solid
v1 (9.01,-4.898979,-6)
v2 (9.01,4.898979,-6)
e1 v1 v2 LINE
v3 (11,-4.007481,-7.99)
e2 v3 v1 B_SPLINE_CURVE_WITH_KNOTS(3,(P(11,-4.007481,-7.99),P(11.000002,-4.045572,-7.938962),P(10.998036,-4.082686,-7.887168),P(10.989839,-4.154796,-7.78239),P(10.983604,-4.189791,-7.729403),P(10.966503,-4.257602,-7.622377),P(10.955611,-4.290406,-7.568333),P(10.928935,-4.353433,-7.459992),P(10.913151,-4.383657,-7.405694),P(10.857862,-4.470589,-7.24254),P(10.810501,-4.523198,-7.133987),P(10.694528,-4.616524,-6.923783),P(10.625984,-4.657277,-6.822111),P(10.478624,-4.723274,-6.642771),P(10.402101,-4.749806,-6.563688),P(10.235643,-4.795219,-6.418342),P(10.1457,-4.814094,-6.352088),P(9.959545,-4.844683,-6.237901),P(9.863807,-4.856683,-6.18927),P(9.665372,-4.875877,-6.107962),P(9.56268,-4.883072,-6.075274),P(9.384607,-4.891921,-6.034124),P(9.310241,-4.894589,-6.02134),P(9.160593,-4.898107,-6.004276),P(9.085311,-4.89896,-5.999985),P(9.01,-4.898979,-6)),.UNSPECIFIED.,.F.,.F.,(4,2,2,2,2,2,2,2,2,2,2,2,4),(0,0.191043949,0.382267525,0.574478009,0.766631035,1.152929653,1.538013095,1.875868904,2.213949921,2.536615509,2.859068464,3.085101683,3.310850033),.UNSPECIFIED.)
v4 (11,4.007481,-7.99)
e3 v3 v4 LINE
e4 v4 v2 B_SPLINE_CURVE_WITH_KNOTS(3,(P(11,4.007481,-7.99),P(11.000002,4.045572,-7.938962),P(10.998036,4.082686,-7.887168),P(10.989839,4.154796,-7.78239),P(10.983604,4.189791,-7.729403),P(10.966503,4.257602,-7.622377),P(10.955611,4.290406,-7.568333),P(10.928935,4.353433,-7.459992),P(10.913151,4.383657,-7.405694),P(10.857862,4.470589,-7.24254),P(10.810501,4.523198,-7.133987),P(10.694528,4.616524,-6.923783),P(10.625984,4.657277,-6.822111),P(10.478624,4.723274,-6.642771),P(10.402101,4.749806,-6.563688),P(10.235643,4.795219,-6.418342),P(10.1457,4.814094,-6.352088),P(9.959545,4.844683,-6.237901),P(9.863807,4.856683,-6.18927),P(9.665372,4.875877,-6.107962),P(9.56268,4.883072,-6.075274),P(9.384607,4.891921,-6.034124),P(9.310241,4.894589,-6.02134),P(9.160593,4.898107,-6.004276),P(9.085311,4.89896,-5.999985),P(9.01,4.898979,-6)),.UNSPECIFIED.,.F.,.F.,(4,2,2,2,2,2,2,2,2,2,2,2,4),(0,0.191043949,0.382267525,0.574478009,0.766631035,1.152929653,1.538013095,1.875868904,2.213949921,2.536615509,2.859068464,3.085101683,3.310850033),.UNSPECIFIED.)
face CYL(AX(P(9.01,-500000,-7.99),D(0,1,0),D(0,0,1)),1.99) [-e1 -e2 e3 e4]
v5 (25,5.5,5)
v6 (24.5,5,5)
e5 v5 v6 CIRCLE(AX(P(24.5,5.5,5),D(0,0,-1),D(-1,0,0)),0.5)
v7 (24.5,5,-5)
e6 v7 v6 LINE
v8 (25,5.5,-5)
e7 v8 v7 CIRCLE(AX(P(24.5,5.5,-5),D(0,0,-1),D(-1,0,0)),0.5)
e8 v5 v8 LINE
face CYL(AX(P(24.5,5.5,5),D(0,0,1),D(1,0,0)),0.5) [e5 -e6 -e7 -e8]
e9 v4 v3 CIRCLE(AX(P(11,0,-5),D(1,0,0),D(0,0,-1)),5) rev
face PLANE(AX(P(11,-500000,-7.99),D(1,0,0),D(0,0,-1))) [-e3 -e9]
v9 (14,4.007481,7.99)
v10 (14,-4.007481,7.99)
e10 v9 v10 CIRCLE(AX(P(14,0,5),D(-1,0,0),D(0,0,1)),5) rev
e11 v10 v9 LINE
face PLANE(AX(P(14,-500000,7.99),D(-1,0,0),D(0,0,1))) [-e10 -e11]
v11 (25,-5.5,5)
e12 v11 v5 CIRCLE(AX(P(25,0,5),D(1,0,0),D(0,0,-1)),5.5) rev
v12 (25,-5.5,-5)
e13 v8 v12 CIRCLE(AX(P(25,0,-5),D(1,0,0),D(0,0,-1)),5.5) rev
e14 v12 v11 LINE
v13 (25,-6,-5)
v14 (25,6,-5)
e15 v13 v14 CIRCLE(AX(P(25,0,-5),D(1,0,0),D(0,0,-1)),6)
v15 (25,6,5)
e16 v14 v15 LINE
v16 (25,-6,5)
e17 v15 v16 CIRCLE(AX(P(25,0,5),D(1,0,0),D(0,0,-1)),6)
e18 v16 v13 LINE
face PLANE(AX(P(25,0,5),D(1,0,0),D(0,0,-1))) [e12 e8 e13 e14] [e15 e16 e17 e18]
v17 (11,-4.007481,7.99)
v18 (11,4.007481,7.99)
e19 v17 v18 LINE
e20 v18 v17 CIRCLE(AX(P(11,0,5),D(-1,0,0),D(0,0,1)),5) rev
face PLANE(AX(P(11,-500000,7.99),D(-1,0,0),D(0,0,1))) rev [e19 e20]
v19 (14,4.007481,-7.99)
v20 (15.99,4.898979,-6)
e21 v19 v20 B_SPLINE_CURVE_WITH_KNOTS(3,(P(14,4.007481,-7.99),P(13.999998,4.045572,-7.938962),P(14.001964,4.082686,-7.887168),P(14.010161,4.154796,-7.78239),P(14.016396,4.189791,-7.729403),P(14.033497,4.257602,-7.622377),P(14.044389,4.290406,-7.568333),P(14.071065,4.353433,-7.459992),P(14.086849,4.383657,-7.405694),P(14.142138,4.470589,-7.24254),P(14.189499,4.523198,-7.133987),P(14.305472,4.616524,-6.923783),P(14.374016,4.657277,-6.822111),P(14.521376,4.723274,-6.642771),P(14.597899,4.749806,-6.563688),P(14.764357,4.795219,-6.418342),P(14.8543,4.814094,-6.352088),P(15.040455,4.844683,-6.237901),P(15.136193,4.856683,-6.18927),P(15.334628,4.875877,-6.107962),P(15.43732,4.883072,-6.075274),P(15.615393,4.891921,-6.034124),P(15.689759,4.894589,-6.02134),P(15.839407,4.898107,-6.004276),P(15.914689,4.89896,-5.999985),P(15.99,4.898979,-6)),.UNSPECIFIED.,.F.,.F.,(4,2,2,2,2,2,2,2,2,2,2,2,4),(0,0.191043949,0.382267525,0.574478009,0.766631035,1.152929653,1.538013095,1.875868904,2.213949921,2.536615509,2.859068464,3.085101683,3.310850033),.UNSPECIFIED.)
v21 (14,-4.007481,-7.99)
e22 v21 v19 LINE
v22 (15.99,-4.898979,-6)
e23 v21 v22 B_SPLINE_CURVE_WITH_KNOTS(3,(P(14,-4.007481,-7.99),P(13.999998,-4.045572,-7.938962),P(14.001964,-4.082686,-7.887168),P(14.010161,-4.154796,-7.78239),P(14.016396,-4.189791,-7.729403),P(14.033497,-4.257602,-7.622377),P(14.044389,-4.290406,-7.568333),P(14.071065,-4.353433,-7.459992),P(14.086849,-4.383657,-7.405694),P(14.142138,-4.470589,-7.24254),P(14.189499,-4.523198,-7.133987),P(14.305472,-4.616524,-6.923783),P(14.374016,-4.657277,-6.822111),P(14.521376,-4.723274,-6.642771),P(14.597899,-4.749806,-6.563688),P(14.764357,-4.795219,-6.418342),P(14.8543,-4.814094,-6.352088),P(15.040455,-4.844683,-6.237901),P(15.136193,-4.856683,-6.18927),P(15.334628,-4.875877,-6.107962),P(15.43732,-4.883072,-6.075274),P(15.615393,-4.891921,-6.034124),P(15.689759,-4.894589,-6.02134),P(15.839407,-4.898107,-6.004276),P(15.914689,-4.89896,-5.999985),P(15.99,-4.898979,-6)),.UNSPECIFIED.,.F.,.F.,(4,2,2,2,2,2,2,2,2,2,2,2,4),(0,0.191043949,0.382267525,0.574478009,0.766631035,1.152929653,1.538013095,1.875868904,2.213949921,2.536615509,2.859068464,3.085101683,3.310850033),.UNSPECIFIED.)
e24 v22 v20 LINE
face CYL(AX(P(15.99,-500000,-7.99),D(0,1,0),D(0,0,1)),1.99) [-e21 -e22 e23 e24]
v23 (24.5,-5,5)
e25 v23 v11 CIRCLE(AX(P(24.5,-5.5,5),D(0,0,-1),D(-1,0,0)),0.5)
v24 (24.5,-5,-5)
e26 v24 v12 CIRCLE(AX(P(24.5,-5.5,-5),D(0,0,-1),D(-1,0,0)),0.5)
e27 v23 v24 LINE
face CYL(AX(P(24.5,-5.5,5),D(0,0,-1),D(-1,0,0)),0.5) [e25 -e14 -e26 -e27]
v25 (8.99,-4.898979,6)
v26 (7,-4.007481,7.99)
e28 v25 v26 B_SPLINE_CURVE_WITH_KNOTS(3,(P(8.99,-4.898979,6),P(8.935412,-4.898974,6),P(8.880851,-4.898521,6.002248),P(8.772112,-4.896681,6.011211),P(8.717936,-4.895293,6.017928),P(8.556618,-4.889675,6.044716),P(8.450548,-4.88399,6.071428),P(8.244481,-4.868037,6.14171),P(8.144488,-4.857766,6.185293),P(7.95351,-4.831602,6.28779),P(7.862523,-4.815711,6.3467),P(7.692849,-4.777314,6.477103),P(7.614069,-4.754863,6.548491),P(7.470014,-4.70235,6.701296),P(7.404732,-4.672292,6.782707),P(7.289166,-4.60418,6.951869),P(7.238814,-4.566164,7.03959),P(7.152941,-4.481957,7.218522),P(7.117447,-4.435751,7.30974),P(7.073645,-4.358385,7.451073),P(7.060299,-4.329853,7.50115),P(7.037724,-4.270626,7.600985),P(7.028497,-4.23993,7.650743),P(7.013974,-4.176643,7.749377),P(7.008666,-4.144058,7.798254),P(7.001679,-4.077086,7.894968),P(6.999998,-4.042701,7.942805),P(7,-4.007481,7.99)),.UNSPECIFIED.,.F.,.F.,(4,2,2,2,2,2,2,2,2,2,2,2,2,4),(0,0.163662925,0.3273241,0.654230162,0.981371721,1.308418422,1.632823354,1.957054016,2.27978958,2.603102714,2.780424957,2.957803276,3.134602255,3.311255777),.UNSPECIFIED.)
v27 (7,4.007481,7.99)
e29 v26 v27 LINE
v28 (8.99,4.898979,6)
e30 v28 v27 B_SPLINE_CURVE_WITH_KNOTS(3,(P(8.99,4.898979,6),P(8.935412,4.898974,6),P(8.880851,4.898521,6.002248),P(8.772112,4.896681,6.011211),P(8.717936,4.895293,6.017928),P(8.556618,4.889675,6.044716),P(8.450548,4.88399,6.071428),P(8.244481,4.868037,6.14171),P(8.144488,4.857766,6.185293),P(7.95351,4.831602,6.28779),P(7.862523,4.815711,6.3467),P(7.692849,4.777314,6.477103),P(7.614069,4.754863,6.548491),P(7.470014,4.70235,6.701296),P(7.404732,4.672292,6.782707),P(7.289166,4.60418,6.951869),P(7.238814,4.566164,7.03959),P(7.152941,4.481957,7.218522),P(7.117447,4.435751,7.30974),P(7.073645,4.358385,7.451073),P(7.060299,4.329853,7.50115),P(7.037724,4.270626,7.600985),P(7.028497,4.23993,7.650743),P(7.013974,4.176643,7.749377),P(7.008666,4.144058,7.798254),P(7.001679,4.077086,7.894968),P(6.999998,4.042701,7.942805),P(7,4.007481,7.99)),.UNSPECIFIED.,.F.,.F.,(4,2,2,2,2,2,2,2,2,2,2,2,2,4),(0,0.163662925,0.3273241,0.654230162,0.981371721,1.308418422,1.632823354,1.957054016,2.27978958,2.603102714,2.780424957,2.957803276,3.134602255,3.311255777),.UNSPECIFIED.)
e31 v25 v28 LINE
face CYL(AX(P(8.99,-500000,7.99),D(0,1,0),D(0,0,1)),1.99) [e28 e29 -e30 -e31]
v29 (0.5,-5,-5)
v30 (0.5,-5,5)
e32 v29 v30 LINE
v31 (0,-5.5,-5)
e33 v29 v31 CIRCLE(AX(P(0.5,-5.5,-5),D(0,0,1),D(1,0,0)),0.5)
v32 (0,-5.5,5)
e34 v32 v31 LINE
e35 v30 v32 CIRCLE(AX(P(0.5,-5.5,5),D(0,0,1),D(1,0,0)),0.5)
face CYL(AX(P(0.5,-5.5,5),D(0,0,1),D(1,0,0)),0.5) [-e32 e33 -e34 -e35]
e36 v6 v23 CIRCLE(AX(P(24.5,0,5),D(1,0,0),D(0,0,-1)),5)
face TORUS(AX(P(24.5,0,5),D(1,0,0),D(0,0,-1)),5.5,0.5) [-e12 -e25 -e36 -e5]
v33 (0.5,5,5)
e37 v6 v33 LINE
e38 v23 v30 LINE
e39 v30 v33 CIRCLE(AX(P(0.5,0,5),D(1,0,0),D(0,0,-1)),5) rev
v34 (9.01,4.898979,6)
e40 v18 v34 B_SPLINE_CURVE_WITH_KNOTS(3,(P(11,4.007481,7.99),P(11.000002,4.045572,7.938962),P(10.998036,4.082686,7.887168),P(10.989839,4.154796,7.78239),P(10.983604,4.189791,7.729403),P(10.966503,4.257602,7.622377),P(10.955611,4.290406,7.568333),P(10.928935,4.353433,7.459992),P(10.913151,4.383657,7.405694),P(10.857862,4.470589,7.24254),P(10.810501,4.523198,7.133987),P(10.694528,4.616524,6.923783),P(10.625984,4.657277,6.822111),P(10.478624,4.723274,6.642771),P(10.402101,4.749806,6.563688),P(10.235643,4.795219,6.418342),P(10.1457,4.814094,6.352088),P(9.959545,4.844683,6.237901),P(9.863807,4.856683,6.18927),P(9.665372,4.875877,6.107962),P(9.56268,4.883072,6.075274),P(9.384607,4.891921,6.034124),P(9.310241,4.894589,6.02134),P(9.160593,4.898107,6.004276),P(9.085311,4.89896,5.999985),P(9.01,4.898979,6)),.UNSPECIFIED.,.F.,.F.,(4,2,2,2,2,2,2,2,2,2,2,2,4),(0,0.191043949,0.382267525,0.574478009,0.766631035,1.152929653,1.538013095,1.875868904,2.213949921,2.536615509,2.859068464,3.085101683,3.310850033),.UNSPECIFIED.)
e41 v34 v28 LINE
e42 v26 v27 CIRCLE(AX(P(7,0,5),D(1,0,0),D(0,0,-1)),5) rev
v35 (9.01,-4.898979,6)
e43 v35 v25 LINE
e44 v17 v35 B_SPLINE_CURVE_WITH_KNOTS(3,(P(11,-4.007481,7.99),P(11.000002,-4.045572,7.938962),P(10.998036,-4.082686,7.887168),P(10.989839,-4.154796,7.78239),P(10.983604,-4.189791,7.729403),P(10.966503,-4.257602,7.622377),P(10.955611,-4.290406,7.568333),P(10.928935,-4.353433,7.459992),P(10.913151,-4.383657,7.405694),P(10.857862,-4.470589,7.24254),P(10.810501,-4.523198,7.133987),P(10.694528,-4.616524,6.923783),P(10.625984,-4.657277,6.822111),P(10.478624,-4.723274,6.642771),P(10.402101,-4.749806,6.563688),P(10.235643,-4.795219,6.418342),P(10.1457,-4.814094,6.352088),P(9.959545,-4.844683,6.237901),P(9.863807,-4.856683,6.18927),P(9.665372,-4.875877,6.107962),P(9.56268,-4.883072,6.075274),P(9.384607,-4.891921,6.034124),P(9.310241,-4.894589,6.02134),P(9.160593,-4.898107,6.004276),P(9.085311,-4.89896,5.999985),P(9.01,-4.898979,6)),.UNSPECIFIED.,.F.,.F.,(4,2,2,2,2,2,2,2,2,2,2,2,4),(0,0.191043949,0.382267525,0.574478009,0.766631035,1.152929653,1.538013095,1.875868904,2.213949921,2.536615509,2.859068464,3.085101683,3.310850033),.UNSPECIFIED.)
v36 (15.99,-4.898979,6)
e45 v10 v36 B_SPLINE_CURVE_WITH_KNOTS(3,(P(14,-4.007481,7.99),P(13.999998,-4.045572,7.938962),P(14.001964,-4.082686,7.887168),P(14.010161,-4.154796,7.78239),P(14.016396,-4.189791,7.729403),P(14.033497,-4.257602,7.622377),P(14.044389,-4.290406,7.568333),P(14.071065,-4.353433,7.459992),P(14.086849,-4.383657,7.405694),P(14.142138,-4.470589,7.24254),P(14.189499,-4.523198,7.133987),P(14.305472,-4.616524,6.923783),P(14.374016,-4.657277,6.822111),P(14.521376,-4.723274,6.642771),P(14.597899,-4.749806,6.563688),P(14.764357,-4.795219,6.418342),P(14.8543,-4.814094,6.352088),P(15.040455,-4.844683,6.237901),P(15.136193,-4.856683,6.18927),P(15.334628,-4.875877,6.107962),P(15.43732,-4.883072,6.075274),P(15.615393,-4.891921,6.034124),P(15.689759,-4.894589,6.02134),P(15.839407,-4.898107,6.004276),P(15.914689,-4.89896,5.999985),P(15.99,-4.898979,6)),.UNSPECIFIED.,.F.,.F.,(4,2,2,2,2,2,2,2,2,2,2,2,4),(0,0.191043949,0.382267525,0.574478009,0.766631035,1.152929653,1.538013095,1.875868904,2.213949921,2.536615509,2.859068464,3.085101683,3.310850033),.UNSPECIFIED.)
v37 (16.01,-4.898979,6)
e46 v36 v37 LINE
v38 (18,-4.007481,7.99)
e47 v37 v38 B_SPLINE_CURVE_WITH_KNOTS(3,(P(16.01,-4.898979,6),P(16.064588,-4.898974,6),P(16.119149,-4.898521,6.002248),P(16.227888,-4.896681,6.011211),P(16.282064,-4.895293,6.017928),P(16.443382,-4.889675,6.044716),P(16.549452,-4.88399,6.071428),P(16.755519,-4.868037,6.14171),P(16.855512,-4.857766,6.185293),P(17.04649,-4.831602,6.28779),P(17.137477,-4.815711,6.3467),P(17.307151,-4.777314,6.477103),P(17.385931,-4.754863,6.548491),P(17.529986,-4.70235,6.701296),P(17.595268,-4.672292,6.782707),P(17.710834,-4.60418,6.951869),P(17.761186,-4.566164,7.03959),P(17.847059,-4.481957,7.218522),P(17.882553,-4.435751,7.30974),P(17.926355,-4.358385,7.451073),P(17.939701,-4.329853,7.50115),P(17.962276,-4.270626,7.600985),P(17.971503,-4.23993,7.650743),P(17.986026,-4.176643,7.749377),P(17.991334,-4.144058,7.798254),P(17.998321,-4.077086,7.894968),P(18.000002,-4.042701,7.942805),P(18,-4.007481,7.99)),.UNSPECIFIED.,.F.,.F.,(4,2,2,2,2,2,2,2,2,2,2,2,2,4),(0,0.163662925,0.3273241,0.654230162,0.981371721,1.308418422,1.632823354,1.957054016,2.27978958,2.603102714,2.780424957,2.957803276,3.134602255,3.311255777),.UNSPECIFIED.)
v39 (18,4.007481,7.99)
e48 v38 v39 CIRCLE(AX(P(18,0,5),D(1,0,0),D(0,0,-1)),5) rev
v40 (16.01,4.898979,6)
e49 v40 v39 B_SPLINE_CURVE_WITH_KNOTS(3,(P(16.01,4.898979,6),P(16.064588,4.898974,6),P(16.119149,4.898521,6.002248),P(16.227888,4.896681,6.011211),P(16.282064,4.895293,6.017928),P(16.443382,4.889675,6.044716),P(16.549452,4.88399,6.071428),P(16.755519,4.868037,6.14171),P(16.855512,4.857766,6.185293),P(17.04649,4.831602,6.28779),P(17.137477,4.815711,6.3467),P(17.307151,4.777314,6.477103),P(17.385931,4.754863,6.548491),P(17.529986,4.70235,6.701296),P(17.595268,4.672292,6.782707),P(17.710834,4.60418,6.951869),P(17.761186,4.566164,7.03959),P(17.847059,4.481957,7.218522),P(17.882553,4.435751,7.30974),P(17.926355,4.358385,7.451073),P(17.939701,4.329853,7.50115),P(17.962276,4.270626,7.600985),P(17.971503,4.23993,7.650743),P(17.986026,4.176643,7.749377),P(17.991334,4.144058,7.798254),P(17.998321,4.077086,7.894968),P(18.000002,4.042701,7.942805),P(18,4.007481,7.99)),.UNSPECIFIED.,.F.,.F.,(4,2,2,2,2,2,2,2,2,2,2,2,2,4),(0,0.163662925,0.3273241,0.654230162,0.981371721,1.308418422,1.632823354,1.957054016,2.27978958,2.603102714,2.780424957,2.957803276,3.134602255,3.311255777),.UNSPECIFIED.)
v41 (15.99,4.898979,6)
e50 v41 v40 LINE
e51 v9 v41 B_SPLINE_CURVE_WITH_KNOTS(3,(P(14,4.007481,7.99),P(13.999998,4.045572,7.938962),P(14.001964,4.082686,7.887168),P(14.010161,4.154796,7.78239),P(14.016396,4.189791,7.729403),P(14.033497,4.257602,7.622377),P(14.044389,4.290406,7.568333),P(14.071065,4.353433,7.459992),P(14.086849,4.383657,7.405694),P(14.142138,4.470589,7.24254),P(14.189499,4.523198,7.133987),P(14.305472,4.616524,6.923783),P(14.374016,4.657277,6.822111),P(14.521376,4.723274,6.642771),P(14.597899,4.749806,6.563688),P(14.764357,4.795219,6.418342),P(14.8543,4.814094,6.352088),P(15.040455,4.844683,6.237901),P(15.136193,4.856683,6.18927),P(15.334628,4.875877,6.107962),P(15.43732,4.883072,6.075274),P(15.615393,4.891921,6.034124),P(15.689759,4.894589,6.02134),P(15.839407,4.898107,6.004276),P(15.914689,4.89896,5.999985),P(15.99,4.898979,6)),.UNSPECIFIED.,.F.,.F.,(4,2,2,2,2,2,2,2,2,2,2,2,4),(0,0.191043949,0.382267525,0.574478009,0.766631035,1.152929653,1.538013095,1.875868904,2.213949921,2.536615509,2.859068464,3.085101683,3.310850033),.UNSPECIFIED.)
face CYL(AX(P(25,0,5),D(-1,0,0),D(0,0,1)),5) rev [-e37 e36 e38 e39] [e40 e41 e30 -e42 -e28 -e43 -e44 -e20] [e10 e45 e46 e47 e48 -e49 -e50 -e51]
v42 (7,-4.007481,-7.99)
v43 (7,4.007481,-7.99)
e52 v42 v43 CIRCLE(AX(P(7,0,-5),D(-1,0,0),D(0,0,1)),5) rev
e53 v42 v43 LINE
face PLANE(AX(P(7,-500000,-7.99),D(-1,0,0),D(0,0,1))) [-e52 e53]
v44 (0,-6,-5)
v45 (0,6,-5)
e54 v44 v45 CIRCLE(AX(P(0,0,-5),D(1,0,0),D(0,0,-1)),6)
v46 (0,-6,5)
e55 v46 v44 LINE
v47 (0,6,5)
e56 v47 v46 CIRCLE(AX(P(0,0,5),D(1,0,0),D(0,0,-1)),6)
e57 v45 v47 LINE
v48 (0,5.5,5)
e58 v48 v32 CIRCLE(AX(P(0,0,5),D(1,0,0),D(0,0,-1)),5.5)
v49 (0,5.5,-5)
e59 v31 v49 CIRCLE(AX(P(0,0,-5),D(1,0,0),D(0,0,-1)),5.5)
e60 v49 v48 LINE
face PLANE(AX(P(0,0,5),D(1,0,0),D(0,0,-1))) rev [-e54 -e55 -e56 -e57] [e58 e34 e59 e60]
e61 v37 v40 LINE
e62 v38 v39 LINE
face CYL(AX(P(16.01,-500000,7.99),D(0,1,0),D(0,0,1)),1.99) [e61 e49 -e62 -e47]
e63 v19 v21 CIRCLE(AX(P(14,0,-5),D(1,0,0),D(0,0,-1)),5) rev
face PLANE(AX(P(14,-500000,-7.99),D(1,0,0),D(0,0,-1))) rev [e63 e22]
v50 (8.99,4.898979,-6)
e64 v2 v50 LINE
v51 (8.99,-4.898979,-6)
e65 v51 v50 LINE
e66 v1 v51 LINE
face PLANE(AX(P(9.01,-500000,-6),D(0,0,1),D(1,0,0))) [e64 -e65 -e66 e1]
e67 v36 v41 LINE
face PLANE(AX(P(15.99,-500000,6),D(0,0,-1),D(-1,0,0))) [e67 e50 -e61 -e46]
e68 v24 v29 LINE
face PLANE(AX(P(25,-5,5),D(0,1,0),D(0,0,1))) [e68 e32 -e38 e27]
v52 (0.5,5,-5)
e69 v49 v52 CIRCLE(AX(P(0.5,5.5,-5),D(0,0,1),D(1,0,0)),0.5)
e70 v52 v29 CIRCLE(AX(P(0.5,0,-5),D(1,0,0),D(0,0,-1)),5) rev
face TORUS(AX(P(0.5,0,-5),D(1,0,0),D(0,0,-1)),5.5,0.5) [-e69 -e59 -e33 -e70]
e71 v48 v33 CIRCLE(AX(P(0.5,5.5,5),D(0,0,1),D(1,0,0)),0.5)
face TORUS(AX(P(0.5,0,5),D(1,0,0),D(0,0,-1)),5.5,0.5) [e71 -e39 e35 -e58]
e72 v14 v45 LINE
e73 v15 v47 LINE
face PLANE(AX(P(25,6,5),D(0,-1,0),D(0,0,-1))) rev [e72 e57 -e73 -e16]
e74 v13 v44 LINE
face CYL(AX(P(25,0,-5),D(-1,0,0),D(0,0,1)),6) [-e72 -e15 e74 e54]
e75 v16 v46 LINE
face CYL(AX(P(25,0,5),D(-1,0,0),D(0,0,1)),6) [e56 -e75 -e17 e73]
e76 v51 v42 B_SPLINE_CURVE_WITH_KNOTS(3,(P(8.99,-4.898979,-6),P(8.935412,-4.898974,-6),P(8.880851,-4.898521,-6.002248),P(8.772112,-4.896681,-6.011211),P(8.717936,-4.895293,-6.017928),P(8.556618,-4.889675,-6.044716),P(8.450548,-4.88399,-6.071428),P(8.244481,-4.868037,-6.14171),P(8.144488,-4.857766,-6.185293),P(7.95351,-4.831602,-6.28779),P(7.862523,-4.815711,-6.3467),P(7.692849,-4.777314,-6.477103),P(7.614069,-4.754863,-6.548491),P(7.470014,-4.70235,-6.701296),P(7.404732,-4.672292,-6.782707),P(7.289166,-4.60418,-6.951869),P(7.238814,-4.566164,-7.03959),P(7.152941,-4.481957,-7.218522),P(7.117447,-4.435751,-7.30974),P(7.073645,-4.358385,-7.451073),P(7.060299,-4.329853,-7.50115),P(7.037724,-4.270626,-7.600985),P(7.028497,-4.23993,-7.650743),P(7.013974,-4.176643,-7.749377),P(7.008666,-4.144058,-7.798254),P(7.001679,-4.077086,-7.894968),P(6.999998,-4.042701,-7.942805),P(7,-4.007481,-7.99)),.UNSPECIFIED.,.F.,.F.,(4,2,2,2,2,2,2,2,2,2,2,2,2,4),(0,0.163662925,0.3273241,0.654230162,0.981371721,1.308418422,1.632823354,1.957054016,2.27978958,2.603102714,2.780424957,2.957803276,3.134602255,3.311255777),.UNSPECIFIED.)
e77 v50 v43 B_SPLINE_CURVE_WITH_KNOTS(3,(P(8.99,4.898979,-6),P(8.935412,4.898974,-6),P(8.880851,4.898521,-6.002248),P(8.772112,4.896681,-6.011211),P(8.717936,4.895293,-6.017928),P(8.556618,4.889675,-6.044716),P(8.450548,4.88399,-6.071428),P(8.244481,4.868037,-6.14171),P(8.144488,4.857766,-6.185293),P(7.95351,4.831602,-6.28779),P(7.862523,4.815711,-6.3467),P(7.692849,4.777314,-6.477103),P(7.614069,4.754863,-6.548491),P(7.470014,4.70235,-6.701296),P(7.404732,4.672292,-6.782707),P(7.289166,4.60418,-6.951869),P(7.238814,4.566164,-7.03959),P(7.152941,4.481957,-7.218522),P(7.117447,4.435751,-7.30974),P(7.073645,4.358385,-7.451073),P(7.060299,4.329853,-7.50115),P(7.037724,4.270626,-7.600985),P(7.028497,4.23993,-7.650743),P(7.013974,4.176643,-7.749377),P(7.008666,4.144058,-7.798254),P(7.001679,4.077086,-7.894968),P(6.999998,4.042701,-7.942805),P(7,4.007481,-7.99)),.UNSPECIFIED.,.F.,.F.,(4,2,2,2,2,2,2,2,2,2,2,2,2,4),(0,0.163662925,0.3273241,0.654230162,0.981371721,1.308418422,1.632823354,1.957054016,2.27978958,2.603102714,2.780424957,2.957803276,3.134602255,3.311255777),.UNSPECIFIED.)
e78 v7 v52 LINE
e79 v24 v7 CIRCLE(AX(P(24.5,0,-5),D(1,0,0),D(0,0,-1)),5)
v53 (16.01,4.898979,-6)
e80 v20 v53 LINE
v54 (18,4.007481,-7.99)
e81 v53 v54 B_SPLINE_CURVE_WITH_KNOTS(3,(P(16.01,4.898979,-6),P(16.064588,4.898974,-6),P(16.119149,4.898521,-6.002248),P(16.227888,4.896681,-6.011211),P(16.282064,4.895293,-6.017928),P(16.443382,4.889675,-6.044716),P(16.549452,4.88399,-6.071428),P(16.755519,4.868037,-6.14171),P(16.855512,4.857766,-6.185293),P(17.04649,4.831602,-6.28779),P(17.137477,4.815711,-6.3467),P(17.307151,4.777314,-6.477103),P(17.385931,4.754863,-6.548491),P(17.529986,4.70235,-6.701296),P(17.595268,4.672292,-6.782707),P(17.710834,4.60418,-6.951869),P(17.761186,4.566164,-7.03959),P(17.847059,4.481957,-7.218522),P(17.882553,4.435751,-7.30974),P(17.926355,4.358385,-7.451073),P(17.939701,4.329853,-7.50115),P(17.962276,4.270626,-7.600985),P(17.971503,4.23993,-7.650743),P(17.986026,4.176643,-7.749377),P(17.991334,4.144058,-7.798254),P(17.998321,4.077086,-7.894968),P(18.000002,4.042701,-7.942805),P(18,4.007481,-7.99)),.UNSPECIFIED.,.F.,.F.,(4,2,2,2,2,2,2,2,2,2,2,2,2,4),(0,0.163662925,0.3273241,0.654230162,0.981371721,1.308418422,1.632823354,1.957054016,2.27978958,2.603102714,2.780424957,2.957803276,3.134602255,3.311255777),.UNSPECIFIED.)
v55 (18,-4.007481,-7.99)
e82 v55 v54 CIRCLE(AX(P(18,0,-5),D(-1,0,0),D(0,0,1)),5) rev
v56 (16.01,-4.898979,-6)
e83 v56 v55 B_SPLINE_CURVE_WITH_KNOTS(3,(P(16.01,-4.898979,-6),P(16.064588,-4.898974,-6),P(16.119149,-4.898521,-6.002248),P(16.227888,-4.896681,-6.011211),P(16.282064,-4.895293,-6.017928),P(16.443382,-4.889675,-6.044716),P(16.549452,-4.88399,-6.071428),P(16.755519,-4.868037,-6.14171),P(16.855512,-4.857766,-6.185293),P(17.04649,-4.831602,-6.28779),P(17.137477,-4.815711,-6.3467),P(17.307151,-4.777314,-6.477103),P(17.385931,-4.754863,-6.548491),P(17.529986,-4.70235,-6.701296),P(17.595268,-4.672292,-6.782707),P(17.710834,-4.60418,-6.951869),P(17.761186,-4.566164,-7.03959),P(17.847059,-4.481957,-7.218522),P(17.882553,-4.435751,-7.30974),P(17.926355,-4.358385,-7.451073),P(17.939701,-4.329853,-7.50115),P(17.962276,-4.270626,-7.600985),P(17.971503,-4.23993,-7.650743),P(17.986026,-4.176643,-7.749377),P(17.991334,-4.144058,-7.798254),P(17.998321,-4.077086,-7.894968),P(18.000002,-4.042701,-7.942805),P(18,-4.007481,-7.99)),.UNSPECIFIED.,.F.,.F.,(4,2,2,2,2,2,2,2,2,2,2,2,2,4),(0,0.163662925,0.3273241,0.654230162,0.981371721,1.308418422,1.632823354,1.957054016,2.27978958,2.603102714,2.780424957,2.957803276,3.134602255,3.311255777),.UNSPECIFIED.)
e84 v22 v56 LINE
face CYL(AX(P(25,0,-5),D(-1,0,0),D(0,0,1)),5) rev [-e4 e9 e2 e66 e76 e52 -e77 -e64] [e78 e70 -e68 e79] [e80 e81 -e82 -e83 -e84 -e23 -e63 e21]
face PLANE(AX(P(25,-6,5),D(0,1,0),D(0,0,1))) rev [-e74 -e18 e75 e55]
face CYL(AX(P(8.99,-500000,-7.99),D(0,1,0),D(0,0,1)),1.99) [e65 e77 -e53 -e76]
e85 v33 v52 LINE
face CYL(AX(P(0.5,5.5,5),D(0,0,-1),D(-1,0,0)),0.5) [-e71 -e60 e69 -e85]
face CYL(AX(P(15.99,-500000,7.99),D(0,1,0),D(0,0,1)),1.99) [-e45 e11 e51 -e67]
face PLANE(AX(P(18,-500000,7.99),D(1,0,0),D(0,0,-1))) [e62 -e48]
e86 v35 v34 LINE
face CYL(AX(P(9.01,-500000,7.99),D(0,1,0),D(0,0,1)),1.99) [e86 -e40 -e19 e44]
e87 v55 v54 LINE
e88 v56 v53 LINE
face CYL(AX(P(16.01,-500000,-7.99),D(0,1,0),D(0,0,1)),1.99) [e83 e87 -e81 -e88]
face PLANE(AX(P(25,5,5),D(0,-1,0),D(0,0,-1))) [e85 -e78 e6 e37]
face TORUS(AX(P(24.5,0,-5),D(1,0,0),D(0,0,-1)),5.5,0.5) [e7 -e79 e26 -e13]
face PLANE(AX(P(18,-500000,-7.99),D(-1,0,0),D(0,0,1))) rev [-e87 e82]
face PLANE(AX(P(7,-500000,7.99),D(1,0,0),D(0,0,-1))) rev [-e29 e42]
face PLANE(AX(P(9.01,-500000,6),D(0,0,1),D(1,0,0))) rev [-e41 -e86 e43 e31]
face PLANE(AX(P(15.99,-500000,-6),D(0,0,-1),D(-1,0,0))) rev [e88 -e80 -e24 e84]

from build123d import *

# Parameters (mm, degrees)
FILLET1_R                       = 0.5
BOSS_EXTRUDE6_REACH             = 29.964
BOSS_EXTRUDE6_DIRECTION_2_REACH = 29.964
MIRROR2_COPY_1_REACH            = 29.964
MIRROR2_COPY_2_REACH            = 29.964
MIRROR2_COPY_3_REACH            = 29.964
MIRROR2_COPY_4_REACH            = 29.964


with BuildPart() as part:
    # Sweep1: sweep along a path in Sketch2path
    with BuildLine(Plane.XY) as sweep1_path:
        Line((0, 0), (25, 0))
    # Sketch3 → Sweep1 (sweep)
    with BuildSketch(Plane(origin=(0, 0, 0), x_dir=(0, 0, -1), z_dir=(1, 0, 0))):
        with BuildLine():
            Line((-5, 6), (5, 6))
            ThreePointArc((5, 6), (11, 0), (5, -6))
            Line((5, -6), (-5, -6))
            ThreePointArc((-5, -6), (-11, 0), (-5, 6))
        make_face()
        with BuildLine():
            Line((-5, 5), (5, 5))
            ThreePointArc((5, 5), (10, 0), (5, -5))
            Line((5, -5), (-5, -5))
            ThreePointArc((-5, -5), (-10, 0), (-5, 5))
        make_face(mode=Mode.SUBTRACT)
    sweep(path=sweep1_path.line)

    # Fillet1
    fillet1_edges = [part.edges().sort_by_distance(p)[0] for p in [
        (25, 0, -10),
        (25, -5, 0),
        (25, 0, 10),
        (0, 0, 10),
        (0, 5, 0),
        (0, 0, -10),
        (25, 5, 0),
        (0, -5, 0),
    ]]
    fillet(fillet1_edges, radius=FILLET1_R)

    # Sketch13 → Boss-Extrude6 (add, up to next)
    with BuildSketch(Plane(origin=(0, 0, 0), x_dir=(1, 0, 0), z_dir=(0, 1, 0)), mode=Mode.PRIVATE) as boss_extrude6_sk1:
        with BuildLine():
            Line((15.99, -6), (16.01, -6))
            ThreePointArc((16.01, -6), (17.417142495, -6.582857505), (18, -7.99))
            Line((18, -7.99), (18, -10))
            Line((18, -10), (14, -10))
            Line((14, -10), (14, -7.99))
            ThreePointArc((14, -7.99), (14.582857505, -6.582857505), (15.99, -6))
        make_face()
    boss_extrude6_tool1 = extrude(boss_extrude6_sk1.sketch, amount=BOSS_EXTRUDE6_REACH, mode=Mode.PRIVATE) - part.part
    boss_extrude6 = boss_extrude6_tool1.solids().sort_by_distance((16, 0, 8.184882))[0]
    add(boss_extrude6)

    # Sketch13 → Boss-Extrude6 direction 2 (add, up to next)
    with BuildSketch(Plane(origin=(0, 0, 0), x_dir=(1, 0, 0), z_dir=(0, 1, 0)), mode=Mode.PRIVATE) as boss_extrude6_direction_2_sk1:
        with BuildLine():
            Line((15.99, -6), (16.01, -6))
            ThreePointArc((16.01, -6), (17.417142495, -6.582857505), (18, -7.99))
            Line((18, -7.99), (18, -10))
            Line((18, -10), (14, -10))
            Line((14, -10), (14, -7.99))
            ThreePointArc((14, -7.99), (14.582857505, -6.582857505), (15.99, -6))
        make_face()
    boss_extrude6_direction_2_tool1 = extrude(boss_extrude6_direction_2_sk1.sketch, amount=-BOSS_EXTRUDE6_DIRECTION_2_REACH, mode=Mode.PRIVATE) - part.part
    boss_extrude6_direction_2 = boss_extrude6_direction_2_tool1.solids().sort_by_distance((16, 0, 8.184882))[0]
    add(boss_extrude6_direction_2)

    # Mirror1: Boss-Extrude6, Boss-Extrude6 direction 2 across plane
    add(boss_extrude6.mirror(Plane(origin=(12.5, 0, 0), x_dir=(0, 0, 1), z_dir=(1, 0, 0))))
    add(boss_extrude6_direction_2.mirror(Plane(origin=(12.5, 0, 0), x_dir=(0, 0, 1), z_dir=(1, 0, 0))))

    # Mirror2 copy 1 sketch → Mirror2 copy 1 (add, up to next)
    with BuildSketch(Plane(origin=(25, 0, 0), x_dir=(-1, 0, 0), z_dir=(0, 1, 0)), mode=Mode.PRIVATE) as mirror2_copy_1_sk1:
        with BuildLine():
            Line((15.99, -6), (16.01, -6))
            ThreePointArc((16.01, -6), (17.417142495, -6.582857505), (18, -7.99))
            Line((18, -7.99), (18, -10))
            Line((18, -10), (14, -10))
            Line((14, -10), (14, -7.99))
            ThreePointArc((14, -7.99), (14.582857505, -6.582857505), (15.99, -6))
        make_face()
    mirror2_copy_1_tool1 = extrude(mirror2_copy_1_sk1.sketch, amount=MIRROR2_COPY_1_REACH, mode=Mode.PRIVATE) - part.part
    add(mirror2_copy_1_tool1.solids().sort_by_distance((9, 0, -8.184882))[0])

    # Mirror2 copy 2 sketch → Mirror2 copy 2 (add, up to next)
    with BuildSketch(Plane(origin=(25, 0, 0), x_dir=(-1, 0, 0), z_dir=(0, 1, 0)), mode=Mode.PRIVATE) as mirror2_copy_2_sk1:
        with BuildLine():
            Line((15.99, -6), (16.01, -6))
            ThreePointArc((16.01, -6), (17.417142495, -6.582857505), (18, -7.99))
            Line((18, -7.99), (18, -10))
            Line((18, -10), (14, -10))
            Line((14, -10), (14, -7.99))
            ThreePointArc((14, -7.99), (14.582857505, -6.582857505), (15.99, -6))
        make_face()
    mirror2_copy_2_tool1 = extrude(mirror2_copy_2_sk1.sketch, amount=-MIRROR2_COPY_2_REACH, mode=Mode.PRIVATE) - part.part
    add(mirror2_copy_2_tool1.solids().sort_by_distance((9, 0, -8.184882))[0])

    # Mirror2 copy 3 sketch → Mirror2 copy 3 (add, up to next)
    with BuildSketch(Plane(origin=(0, 0, 0), x_dir=(1, 0, 0), z_dir=(0, 1, 0)), mode=Mode.PRIVATE) as mirror2_copy_3_sk1:
        with BuildLine():
            Line((15.99, 6), (16.01, 6))
            ThreePointArc((16.01, 6), (17.417142495, 6.582857505), (18, 7.99))
            Line((18, 7.99), (18, 10))
            Line((18, 10), (14, 10))
            Line((14, 10), (14, 7.99))
            ThreePointArc((14, 7.99), (14.582857505, 6.582857505), (15.99, 6))
        make_face()
    mirror2_copy_3_tool1 = extrude(mirror2_copy_3_sk1.sketch, amount=MIRROR2_COPY_3_REACH, mode=Mode.PRIVATE) - part.part
    add(mirror2_copy_3_tool1.solids().sort_by_distance((16, 0, -8.184882))[0])

    # Mirror2 copy 4 sketch → Mirror2 copy 4 (add, up to next)
    with BuildSketch(Plane(origin=(0, 0, 0), x_dir=(1, 0, 0), z_dir=(0, 1, 0)), mode=Mode.PRIVATE) as mirror2_copy_4_sk1:
        with BuildLine():
            Line((15.99, 6), (16.01, 6))
            ThreePointArc((16.01, 6), (17.417142495, 6.582857505), (18, 7.99))
            Line((18, 7.99), (18, 10))
            Line((18, 10), (14, 10))
            Line((14, 10), (14, 7.99))
            ThreePointArc((14, 7.99), (14.582857505, 6.582857505), (15.99, 6))
        make_face()
    mirror2_copy_4_tool1 = extrude(mirror2_copy_4_sk1.sketch, amount=-MIRROR2_COPY_4_REACH, mode=Mode.PRIVATE) - part.part
    add(mirror2_copy_4_tool1.solids().sort_by_distance((16, 0, -8.184882))[0])


solid = part.part
